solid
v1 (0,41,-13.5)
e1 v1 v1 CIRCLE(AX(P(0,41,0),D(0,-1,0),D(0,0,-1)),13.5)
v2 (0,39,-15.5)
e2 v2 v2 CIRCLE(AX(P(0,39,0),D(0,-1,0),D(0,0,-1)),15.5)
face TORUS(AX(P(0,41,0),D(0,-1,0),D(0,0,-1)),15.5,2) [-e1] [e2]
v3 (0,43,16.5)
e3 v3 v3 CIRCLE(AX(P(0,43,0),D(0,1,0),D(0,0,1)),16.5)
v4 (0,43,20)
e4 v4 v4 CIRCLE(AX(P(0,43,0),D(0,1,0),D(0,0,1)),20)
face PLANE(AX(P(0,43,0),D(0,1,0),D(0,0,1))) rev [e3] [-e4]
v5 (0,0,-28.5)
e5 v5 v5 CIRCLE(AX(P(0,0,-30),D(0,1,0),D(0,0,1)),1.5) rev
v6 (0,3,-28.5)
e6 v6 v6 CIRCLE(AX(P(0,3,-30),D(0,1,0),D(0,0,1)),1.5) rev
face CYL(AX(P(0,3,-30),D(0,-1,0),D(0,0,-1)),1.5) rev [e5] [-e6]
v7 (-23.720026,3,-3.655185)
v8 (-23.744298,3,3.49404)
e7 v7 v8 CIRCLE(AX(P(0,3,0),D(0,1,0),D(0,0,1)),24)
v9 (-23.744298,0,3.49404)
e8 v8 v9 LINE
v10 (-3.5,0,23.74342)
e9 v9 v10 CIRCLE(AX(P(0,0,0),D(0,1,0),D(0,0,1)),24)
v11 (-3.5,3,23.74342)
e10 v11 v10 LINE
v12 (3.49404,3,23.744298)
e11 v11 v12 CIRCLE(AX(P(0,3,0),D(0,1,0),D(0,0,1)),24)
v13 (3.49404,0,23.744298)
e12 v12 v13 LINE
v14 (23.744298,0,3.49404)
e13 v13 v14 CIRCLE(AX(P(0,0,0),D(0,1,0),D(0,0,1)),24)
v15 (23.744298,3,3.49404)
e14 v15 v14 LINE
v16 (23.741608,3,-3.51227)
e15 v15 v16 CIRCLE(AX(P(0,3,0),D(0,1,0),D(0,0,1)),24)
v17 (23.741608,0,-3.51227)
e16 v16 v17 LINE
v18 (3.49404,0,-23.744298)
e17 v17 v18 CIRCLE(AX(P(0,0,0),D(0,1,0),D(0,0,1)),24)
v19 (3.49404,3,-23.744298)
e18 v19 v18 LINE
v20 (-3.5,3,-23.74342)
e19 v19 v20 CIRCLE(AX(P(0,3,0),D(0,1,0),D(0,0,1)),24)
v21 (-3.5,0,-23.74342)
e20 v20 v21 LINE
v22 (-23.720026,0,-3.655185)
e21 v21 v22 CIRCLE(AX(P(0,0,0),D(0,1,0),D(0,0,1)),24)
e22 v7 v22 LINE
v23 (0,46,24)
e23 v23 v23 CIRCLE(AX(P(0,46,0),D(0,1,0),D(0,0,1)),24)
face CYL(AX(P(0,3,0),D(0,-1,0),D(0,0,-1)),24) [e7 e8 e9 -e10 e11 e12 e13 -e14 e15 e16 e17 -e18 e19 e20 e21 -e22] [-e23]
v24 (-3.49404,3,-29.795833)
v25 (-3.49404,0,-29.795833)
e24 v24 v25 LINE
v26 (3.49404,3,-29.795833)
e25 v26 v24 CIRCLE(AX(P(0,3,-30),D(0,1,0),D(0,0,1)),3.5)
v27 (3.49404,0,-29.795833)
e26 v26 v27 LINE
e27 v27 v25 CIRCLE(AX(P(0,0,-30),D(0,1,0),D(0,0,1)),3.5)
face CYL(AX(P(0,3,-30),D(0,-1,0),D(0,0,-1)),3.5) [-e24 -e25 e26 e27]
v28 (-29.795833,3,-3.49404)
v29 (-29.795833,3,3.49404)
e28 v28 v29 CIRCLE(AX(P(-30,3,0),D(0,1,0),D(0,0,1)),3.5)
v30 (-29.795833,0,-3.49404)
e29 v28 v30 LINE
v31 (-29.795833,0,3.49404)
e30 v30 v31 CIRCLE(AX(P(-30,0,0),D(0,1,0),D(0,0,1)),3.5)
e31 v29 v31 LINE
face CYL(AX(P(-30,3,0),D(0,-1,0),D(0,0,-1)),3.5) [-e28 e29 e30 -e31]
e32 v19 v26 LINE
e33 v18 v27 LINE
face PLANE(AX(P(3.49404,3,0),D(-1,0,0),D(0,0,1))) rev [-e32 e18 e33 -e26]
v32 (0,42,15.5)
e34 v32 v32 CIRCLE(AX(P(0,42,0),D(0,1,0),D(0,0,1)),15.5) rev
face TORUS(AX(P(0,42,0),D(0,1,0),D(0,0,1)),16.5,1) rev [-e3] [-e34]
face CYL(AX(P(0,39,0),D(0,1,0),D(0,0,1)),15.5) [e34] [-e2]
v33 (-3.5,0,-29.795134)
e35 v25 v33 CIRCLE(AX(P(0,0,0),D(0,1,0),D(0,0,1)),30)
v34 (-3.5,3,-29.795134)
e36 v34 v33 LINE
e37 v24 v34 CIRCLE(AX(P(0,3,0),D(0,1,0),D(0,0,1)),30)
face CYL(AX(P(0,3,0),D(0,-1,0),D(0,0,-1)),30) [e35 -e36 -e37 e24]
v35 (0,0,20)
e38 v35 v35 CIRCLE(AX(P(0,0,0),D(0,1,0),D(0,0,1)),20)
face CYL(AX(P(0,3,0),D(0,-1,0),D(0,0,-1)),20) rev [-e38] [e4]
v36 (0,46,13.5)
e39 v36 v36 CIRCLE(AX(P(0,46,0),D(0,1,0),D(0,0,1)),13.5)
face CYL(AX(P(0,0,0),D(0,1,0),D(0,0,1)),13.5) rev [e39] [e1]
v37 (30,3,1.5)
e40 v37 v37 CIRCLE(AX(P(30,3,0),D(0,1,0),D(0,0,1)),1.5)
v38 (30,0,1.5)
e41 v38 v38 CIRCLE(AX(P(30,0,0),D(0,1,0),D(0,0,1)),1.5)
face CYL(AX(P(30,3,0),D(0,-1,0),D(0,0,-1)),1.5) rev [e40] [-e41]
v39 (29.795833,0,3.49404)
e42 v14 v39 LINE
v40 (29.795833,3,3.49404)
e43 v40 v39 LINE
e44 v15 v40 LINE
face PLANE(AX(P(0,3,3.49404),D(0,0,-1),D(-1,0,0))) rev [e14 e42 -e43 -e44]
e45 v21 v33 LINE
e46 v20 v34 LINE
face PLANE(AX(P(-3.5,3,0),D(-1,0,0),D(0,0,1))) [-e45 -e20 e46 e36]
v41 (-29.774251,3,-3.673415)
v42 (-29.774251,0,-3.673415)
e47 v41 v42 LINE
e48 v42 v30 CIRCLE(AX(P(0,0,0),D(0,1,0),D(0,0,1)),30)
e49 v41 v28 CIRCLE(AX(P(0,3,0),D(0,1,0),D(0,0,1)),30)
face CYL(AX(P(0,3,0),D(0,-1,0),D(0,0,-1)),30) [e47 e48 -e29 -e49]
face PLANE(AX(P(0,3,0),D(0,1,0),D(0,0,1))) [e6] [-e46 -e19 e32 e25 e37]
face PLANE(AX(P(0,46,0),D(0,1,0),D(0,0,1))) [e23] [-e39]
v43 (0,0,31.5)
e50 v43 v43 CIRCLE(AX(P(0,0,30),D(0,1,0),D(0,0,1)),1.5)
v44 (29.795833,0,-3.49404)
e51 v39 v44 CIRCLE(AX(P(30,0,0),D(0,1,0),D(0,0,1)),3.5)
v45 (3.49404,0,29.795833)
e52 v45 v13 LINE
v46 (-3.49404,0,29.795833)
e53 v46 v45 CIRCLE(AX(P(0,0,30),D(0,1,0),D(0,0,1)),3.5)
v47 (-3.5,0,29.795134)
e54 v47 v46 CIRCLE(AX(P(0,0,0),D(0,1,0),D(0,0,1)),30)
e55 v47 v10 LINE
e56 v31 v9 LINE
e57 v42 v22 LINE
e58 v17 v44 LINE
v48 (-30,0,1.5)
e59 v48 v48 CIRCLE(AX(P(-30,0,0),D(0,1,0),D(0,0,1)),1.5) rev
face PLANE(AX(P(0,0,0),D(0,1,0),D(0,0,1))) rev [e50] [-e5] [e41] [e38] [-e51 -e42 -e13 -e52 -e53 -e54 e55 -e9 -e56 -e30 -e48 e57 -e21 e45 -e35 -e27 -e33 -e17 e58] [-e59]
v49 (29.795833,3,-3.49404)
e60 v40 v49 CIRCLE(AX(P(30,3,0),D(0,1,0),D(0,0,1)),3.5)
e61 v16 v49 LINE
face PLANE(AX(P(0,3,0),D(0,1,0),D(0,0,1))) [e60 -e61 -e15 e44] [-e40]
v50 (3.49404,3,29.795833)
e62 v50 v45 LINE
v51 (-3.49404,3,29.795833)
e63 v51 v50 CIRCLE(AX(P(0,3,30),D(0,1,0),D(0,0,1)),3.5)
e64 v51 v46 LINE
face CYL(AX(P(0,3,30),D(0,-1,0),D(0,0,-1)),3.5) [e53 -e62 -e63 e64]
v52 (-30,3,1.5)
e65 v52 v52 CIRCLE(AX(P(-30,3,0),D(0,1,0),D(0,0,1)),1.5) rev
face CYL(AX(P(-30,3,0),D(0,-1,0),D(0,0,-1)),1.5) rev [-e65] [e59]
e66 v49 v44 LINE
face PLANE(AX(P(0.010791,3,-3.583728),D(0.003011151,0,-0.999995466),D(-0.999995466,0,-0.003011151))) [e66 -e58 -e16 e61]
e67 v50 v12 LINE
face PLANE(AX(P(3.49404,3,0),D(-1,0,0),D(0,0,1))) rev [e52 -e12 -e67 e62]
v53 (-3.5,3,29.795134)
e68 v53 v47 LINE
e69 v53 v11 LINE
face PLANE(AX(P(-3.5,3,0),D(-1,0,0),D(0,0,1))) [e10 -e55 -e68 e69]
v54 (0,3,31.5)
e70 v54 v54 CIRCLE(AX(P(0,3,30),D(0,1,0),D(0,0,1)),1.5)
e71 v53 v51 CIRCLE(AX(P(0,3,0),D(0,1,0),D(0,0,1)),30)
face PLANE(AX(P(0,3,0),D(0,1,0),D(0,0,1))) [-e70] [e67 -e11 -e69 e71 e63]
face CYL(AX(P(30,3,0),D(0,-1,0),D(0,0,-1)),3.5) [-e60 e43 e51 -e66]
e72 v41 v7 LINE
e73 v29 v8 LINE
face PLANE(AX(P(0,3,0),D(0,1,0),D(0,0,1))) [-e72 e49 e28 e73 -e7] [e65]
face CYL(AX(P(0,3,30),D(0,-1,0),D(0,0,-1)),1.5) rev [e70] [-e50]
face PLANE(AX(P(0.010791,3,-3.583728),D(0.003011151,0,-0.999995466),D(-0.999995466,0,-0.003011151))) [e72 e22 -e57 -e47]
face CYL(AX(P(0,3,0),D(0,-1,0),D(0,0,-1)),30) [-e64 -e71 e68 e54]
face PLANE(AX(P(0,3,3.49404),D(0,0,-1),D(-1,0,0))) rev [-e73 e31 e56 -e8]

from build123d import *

# Parameters (mm, degrees)
SKETCH1_R           = 1.5
SKETCH1_R_2         = 20
BOSS_EXTRUDE1_DEPTH = 3
SKETCH2_R           = 24
SKETCH2_R_2         = 20
BOSS_EXTRUDE2_DEPTH = 40
SKETCH3_R           = 24
BOSS_EXTRUDE3_DEPTH = 3
SKETCH4_R           = 13.5
CUT_EXTRUDE1_DEPTH  = 67.034082109
SKETCH5_R           = 15.5
SKETCH5_R_2         = 13.5
BOSS_EXTRUDE4_DEPTH = 4
FILLET1_R           = 1
FILLET2_R           = 2


with BuildPart() as part:
    # Sketch1 → Boss-Extrude1 (new body)
    with BuildSketch(Plane(origin=(0, 0, 0), x_dir=(1, 0, 0), z_dir=(0, 1, 0))):
        with BuildLine():
            ThreePointArc((-29.774250944, 3.673415402), (-29.785177171, 3.58374398), (-29.795833333, 3.494040065))
            ThreePointArc((-29.795833333, 3.494040065), (-33.5, 0), (-29.795833333, -3.494040065))
            Line((-29.795833333, -3.494040065), (-23.744297927, -3.494040065))
            ThreePointArc((-23.744297927, -3.494040065), (-16.972692501, -16.968432728), (-3.5, -23.743420141))
            Line((-3.5, -23.743420141), (-3.5, -29.795133831))
            ThreePointArc((-3.5, -29.795133831), (-3.49702005, -29.795483731), (-3.494040065, -29.795833333))
            ThreePointArc((-3.494040065, -29.795833333), (0, -33.5), (3.494040064, -29.795833333))
            Line((3.494040064, -29.795833333), (3.494040064, -23.744297927))
            ThreePointArc((3.494040064, -23.744297927), (16.970562748, -16.970562749), (23.744297927, -3.494040065))
            Line((23.744297927, -3.494040065), (29.795833333, -3.494040065))
            ThreePointArc((29.795833333, -3.494040064), (33.5, 0), (29.795833333, 3.494040064))
            Line((29.795833333, 3.494040064), (23.741608141, 3.512270334))
            ThreePointArc((23.741608141, 3.512270334), (16.964046346, 16.97707665), (3.494040064, 23.744297927))
            Line((3.494040064, 23.744297927), (3.494040064, 29.795833333))
            ThreePointArc((3.494040064, 29.795833333), (0, 33.5), (-3.494040065, 29.795833333))
            ThreePointArc((-3.494040064, 29.795833333), (-3.49702005, 29.795483731), (-3.5, 29.795133831))
            Line((-3.5, 29.795133831), (-3.5, 23.743420141))
            ThreePointArc((-3.5, 23.743420141), (-16.914985868, 17.025958213), (-23.720025751, 3.655185133))
            Line((-23.720025751, 3.655185133), (-29.774250944, 3.673415402))
        make_face()
        with Locations(Location((0, -30, 0), (0, 0, 270))):
            Circle(SKETCH1_R, mode=Mode.SUBTRACT)
        with Locations(Location((-30, 0, 0), (0, 0, 270))):
            Circle(SKETCH1_R, mode=Mode.SUBTRACT)
        with Locations(Location((0, 0, 0), (0, 0, 270))):
            Circle(SKETCH1_R_2, mode=Mode.SUBTRACT)
        with Locations(Location((0, 30, 0), (0, 0, 270))):
            Circle(SKETCH1_R, mode=Mode.SUBTRACT)
        with Locations(Location((30, 0, 0), (0, 0, 270))):
            Circle(SKETCH1_R, mode=Mode.SUBTRACT)
    extrude(amount=BOSS_EXTRUDE1_DEPTH)

    # Sketch2 → Boss-Extrude2 (add)
    with BuildSketch(Plane(origin=(0, 3, 0), x_dir=(1, 0, 0), z_dir=(0, 1, 0))):
        with Locations(Location((0, 0, 0), (0, 0, 81.628843141))):
            Circle(SKETCH2_R)
        with Locations(Location((0, 0, 0), (0, 0, 270))):
            Circle(SKETCH2_R_2, mode=Mode.SUBTRACT)
    extrude(amount=BOSS_EXTRUDE2_DEPTH)

    # Sketch3 → Boss-Extrude3 (add)
    with BuildSketch(Plane(origin=(0, 43, 0), x_dir=(1, 0, 0), z_dir=(0, 1, 0))):
        with Locations(Location((0, 0, 0), (0, 0, 81.628843141))):
            Circle(SKETCH3_R)
    extrude(amount=BOSS_EXTRUDE3_DEPTH)

    # Sketch4 → Cut-Extrude1 (cut, through all)
    with BuildSketch(Plane(origin=(0, 46, 0), x_dir=(1, 0, 0), z_dir=(0, 1, 0))):
        with Locations(Location((0, 0, 0), (0, 0, 270))):
            Circle(SKETCH4_R)
    extrude(amount=-CUT_EXTRUDE1_DEPTH, mode=Mode.SUBTRACT)

    # Sketch5 → Boss-Extrude4 (add)
    with BuildSketch(Plane.XZ.offset(-43)):
        with Locations(Location((0, 0, 0), (0, 0, 90))):
            Circle(SKETCH5_R)
        with Locations(Location((0, 0, 0), (0, 0, 90))):
            Circle(SKETCH5_R_2, mode=Mode.SUBTRACT)
    extrude(amount=BOSS_EXTRUDE4_DEPTH)

    # Fillet1
    fillet1_edges = [part.edges().sort_by_distance(p)[0] for p in [
        (0, 43, -15.5),
    ]]
    fillet(fillet1_edges, radius=FILLET1_R)

    # Fillet2
    fillet2_edges = [part.edges().sort_by_distance(p)[0] for p in [
        (0, 39, -13.5),
    ]]
    fillet(fillet2_edges, radius=FILLET2_R - 0.0001)  # a hair under: the kernel refuses the full size


solid = part.part
